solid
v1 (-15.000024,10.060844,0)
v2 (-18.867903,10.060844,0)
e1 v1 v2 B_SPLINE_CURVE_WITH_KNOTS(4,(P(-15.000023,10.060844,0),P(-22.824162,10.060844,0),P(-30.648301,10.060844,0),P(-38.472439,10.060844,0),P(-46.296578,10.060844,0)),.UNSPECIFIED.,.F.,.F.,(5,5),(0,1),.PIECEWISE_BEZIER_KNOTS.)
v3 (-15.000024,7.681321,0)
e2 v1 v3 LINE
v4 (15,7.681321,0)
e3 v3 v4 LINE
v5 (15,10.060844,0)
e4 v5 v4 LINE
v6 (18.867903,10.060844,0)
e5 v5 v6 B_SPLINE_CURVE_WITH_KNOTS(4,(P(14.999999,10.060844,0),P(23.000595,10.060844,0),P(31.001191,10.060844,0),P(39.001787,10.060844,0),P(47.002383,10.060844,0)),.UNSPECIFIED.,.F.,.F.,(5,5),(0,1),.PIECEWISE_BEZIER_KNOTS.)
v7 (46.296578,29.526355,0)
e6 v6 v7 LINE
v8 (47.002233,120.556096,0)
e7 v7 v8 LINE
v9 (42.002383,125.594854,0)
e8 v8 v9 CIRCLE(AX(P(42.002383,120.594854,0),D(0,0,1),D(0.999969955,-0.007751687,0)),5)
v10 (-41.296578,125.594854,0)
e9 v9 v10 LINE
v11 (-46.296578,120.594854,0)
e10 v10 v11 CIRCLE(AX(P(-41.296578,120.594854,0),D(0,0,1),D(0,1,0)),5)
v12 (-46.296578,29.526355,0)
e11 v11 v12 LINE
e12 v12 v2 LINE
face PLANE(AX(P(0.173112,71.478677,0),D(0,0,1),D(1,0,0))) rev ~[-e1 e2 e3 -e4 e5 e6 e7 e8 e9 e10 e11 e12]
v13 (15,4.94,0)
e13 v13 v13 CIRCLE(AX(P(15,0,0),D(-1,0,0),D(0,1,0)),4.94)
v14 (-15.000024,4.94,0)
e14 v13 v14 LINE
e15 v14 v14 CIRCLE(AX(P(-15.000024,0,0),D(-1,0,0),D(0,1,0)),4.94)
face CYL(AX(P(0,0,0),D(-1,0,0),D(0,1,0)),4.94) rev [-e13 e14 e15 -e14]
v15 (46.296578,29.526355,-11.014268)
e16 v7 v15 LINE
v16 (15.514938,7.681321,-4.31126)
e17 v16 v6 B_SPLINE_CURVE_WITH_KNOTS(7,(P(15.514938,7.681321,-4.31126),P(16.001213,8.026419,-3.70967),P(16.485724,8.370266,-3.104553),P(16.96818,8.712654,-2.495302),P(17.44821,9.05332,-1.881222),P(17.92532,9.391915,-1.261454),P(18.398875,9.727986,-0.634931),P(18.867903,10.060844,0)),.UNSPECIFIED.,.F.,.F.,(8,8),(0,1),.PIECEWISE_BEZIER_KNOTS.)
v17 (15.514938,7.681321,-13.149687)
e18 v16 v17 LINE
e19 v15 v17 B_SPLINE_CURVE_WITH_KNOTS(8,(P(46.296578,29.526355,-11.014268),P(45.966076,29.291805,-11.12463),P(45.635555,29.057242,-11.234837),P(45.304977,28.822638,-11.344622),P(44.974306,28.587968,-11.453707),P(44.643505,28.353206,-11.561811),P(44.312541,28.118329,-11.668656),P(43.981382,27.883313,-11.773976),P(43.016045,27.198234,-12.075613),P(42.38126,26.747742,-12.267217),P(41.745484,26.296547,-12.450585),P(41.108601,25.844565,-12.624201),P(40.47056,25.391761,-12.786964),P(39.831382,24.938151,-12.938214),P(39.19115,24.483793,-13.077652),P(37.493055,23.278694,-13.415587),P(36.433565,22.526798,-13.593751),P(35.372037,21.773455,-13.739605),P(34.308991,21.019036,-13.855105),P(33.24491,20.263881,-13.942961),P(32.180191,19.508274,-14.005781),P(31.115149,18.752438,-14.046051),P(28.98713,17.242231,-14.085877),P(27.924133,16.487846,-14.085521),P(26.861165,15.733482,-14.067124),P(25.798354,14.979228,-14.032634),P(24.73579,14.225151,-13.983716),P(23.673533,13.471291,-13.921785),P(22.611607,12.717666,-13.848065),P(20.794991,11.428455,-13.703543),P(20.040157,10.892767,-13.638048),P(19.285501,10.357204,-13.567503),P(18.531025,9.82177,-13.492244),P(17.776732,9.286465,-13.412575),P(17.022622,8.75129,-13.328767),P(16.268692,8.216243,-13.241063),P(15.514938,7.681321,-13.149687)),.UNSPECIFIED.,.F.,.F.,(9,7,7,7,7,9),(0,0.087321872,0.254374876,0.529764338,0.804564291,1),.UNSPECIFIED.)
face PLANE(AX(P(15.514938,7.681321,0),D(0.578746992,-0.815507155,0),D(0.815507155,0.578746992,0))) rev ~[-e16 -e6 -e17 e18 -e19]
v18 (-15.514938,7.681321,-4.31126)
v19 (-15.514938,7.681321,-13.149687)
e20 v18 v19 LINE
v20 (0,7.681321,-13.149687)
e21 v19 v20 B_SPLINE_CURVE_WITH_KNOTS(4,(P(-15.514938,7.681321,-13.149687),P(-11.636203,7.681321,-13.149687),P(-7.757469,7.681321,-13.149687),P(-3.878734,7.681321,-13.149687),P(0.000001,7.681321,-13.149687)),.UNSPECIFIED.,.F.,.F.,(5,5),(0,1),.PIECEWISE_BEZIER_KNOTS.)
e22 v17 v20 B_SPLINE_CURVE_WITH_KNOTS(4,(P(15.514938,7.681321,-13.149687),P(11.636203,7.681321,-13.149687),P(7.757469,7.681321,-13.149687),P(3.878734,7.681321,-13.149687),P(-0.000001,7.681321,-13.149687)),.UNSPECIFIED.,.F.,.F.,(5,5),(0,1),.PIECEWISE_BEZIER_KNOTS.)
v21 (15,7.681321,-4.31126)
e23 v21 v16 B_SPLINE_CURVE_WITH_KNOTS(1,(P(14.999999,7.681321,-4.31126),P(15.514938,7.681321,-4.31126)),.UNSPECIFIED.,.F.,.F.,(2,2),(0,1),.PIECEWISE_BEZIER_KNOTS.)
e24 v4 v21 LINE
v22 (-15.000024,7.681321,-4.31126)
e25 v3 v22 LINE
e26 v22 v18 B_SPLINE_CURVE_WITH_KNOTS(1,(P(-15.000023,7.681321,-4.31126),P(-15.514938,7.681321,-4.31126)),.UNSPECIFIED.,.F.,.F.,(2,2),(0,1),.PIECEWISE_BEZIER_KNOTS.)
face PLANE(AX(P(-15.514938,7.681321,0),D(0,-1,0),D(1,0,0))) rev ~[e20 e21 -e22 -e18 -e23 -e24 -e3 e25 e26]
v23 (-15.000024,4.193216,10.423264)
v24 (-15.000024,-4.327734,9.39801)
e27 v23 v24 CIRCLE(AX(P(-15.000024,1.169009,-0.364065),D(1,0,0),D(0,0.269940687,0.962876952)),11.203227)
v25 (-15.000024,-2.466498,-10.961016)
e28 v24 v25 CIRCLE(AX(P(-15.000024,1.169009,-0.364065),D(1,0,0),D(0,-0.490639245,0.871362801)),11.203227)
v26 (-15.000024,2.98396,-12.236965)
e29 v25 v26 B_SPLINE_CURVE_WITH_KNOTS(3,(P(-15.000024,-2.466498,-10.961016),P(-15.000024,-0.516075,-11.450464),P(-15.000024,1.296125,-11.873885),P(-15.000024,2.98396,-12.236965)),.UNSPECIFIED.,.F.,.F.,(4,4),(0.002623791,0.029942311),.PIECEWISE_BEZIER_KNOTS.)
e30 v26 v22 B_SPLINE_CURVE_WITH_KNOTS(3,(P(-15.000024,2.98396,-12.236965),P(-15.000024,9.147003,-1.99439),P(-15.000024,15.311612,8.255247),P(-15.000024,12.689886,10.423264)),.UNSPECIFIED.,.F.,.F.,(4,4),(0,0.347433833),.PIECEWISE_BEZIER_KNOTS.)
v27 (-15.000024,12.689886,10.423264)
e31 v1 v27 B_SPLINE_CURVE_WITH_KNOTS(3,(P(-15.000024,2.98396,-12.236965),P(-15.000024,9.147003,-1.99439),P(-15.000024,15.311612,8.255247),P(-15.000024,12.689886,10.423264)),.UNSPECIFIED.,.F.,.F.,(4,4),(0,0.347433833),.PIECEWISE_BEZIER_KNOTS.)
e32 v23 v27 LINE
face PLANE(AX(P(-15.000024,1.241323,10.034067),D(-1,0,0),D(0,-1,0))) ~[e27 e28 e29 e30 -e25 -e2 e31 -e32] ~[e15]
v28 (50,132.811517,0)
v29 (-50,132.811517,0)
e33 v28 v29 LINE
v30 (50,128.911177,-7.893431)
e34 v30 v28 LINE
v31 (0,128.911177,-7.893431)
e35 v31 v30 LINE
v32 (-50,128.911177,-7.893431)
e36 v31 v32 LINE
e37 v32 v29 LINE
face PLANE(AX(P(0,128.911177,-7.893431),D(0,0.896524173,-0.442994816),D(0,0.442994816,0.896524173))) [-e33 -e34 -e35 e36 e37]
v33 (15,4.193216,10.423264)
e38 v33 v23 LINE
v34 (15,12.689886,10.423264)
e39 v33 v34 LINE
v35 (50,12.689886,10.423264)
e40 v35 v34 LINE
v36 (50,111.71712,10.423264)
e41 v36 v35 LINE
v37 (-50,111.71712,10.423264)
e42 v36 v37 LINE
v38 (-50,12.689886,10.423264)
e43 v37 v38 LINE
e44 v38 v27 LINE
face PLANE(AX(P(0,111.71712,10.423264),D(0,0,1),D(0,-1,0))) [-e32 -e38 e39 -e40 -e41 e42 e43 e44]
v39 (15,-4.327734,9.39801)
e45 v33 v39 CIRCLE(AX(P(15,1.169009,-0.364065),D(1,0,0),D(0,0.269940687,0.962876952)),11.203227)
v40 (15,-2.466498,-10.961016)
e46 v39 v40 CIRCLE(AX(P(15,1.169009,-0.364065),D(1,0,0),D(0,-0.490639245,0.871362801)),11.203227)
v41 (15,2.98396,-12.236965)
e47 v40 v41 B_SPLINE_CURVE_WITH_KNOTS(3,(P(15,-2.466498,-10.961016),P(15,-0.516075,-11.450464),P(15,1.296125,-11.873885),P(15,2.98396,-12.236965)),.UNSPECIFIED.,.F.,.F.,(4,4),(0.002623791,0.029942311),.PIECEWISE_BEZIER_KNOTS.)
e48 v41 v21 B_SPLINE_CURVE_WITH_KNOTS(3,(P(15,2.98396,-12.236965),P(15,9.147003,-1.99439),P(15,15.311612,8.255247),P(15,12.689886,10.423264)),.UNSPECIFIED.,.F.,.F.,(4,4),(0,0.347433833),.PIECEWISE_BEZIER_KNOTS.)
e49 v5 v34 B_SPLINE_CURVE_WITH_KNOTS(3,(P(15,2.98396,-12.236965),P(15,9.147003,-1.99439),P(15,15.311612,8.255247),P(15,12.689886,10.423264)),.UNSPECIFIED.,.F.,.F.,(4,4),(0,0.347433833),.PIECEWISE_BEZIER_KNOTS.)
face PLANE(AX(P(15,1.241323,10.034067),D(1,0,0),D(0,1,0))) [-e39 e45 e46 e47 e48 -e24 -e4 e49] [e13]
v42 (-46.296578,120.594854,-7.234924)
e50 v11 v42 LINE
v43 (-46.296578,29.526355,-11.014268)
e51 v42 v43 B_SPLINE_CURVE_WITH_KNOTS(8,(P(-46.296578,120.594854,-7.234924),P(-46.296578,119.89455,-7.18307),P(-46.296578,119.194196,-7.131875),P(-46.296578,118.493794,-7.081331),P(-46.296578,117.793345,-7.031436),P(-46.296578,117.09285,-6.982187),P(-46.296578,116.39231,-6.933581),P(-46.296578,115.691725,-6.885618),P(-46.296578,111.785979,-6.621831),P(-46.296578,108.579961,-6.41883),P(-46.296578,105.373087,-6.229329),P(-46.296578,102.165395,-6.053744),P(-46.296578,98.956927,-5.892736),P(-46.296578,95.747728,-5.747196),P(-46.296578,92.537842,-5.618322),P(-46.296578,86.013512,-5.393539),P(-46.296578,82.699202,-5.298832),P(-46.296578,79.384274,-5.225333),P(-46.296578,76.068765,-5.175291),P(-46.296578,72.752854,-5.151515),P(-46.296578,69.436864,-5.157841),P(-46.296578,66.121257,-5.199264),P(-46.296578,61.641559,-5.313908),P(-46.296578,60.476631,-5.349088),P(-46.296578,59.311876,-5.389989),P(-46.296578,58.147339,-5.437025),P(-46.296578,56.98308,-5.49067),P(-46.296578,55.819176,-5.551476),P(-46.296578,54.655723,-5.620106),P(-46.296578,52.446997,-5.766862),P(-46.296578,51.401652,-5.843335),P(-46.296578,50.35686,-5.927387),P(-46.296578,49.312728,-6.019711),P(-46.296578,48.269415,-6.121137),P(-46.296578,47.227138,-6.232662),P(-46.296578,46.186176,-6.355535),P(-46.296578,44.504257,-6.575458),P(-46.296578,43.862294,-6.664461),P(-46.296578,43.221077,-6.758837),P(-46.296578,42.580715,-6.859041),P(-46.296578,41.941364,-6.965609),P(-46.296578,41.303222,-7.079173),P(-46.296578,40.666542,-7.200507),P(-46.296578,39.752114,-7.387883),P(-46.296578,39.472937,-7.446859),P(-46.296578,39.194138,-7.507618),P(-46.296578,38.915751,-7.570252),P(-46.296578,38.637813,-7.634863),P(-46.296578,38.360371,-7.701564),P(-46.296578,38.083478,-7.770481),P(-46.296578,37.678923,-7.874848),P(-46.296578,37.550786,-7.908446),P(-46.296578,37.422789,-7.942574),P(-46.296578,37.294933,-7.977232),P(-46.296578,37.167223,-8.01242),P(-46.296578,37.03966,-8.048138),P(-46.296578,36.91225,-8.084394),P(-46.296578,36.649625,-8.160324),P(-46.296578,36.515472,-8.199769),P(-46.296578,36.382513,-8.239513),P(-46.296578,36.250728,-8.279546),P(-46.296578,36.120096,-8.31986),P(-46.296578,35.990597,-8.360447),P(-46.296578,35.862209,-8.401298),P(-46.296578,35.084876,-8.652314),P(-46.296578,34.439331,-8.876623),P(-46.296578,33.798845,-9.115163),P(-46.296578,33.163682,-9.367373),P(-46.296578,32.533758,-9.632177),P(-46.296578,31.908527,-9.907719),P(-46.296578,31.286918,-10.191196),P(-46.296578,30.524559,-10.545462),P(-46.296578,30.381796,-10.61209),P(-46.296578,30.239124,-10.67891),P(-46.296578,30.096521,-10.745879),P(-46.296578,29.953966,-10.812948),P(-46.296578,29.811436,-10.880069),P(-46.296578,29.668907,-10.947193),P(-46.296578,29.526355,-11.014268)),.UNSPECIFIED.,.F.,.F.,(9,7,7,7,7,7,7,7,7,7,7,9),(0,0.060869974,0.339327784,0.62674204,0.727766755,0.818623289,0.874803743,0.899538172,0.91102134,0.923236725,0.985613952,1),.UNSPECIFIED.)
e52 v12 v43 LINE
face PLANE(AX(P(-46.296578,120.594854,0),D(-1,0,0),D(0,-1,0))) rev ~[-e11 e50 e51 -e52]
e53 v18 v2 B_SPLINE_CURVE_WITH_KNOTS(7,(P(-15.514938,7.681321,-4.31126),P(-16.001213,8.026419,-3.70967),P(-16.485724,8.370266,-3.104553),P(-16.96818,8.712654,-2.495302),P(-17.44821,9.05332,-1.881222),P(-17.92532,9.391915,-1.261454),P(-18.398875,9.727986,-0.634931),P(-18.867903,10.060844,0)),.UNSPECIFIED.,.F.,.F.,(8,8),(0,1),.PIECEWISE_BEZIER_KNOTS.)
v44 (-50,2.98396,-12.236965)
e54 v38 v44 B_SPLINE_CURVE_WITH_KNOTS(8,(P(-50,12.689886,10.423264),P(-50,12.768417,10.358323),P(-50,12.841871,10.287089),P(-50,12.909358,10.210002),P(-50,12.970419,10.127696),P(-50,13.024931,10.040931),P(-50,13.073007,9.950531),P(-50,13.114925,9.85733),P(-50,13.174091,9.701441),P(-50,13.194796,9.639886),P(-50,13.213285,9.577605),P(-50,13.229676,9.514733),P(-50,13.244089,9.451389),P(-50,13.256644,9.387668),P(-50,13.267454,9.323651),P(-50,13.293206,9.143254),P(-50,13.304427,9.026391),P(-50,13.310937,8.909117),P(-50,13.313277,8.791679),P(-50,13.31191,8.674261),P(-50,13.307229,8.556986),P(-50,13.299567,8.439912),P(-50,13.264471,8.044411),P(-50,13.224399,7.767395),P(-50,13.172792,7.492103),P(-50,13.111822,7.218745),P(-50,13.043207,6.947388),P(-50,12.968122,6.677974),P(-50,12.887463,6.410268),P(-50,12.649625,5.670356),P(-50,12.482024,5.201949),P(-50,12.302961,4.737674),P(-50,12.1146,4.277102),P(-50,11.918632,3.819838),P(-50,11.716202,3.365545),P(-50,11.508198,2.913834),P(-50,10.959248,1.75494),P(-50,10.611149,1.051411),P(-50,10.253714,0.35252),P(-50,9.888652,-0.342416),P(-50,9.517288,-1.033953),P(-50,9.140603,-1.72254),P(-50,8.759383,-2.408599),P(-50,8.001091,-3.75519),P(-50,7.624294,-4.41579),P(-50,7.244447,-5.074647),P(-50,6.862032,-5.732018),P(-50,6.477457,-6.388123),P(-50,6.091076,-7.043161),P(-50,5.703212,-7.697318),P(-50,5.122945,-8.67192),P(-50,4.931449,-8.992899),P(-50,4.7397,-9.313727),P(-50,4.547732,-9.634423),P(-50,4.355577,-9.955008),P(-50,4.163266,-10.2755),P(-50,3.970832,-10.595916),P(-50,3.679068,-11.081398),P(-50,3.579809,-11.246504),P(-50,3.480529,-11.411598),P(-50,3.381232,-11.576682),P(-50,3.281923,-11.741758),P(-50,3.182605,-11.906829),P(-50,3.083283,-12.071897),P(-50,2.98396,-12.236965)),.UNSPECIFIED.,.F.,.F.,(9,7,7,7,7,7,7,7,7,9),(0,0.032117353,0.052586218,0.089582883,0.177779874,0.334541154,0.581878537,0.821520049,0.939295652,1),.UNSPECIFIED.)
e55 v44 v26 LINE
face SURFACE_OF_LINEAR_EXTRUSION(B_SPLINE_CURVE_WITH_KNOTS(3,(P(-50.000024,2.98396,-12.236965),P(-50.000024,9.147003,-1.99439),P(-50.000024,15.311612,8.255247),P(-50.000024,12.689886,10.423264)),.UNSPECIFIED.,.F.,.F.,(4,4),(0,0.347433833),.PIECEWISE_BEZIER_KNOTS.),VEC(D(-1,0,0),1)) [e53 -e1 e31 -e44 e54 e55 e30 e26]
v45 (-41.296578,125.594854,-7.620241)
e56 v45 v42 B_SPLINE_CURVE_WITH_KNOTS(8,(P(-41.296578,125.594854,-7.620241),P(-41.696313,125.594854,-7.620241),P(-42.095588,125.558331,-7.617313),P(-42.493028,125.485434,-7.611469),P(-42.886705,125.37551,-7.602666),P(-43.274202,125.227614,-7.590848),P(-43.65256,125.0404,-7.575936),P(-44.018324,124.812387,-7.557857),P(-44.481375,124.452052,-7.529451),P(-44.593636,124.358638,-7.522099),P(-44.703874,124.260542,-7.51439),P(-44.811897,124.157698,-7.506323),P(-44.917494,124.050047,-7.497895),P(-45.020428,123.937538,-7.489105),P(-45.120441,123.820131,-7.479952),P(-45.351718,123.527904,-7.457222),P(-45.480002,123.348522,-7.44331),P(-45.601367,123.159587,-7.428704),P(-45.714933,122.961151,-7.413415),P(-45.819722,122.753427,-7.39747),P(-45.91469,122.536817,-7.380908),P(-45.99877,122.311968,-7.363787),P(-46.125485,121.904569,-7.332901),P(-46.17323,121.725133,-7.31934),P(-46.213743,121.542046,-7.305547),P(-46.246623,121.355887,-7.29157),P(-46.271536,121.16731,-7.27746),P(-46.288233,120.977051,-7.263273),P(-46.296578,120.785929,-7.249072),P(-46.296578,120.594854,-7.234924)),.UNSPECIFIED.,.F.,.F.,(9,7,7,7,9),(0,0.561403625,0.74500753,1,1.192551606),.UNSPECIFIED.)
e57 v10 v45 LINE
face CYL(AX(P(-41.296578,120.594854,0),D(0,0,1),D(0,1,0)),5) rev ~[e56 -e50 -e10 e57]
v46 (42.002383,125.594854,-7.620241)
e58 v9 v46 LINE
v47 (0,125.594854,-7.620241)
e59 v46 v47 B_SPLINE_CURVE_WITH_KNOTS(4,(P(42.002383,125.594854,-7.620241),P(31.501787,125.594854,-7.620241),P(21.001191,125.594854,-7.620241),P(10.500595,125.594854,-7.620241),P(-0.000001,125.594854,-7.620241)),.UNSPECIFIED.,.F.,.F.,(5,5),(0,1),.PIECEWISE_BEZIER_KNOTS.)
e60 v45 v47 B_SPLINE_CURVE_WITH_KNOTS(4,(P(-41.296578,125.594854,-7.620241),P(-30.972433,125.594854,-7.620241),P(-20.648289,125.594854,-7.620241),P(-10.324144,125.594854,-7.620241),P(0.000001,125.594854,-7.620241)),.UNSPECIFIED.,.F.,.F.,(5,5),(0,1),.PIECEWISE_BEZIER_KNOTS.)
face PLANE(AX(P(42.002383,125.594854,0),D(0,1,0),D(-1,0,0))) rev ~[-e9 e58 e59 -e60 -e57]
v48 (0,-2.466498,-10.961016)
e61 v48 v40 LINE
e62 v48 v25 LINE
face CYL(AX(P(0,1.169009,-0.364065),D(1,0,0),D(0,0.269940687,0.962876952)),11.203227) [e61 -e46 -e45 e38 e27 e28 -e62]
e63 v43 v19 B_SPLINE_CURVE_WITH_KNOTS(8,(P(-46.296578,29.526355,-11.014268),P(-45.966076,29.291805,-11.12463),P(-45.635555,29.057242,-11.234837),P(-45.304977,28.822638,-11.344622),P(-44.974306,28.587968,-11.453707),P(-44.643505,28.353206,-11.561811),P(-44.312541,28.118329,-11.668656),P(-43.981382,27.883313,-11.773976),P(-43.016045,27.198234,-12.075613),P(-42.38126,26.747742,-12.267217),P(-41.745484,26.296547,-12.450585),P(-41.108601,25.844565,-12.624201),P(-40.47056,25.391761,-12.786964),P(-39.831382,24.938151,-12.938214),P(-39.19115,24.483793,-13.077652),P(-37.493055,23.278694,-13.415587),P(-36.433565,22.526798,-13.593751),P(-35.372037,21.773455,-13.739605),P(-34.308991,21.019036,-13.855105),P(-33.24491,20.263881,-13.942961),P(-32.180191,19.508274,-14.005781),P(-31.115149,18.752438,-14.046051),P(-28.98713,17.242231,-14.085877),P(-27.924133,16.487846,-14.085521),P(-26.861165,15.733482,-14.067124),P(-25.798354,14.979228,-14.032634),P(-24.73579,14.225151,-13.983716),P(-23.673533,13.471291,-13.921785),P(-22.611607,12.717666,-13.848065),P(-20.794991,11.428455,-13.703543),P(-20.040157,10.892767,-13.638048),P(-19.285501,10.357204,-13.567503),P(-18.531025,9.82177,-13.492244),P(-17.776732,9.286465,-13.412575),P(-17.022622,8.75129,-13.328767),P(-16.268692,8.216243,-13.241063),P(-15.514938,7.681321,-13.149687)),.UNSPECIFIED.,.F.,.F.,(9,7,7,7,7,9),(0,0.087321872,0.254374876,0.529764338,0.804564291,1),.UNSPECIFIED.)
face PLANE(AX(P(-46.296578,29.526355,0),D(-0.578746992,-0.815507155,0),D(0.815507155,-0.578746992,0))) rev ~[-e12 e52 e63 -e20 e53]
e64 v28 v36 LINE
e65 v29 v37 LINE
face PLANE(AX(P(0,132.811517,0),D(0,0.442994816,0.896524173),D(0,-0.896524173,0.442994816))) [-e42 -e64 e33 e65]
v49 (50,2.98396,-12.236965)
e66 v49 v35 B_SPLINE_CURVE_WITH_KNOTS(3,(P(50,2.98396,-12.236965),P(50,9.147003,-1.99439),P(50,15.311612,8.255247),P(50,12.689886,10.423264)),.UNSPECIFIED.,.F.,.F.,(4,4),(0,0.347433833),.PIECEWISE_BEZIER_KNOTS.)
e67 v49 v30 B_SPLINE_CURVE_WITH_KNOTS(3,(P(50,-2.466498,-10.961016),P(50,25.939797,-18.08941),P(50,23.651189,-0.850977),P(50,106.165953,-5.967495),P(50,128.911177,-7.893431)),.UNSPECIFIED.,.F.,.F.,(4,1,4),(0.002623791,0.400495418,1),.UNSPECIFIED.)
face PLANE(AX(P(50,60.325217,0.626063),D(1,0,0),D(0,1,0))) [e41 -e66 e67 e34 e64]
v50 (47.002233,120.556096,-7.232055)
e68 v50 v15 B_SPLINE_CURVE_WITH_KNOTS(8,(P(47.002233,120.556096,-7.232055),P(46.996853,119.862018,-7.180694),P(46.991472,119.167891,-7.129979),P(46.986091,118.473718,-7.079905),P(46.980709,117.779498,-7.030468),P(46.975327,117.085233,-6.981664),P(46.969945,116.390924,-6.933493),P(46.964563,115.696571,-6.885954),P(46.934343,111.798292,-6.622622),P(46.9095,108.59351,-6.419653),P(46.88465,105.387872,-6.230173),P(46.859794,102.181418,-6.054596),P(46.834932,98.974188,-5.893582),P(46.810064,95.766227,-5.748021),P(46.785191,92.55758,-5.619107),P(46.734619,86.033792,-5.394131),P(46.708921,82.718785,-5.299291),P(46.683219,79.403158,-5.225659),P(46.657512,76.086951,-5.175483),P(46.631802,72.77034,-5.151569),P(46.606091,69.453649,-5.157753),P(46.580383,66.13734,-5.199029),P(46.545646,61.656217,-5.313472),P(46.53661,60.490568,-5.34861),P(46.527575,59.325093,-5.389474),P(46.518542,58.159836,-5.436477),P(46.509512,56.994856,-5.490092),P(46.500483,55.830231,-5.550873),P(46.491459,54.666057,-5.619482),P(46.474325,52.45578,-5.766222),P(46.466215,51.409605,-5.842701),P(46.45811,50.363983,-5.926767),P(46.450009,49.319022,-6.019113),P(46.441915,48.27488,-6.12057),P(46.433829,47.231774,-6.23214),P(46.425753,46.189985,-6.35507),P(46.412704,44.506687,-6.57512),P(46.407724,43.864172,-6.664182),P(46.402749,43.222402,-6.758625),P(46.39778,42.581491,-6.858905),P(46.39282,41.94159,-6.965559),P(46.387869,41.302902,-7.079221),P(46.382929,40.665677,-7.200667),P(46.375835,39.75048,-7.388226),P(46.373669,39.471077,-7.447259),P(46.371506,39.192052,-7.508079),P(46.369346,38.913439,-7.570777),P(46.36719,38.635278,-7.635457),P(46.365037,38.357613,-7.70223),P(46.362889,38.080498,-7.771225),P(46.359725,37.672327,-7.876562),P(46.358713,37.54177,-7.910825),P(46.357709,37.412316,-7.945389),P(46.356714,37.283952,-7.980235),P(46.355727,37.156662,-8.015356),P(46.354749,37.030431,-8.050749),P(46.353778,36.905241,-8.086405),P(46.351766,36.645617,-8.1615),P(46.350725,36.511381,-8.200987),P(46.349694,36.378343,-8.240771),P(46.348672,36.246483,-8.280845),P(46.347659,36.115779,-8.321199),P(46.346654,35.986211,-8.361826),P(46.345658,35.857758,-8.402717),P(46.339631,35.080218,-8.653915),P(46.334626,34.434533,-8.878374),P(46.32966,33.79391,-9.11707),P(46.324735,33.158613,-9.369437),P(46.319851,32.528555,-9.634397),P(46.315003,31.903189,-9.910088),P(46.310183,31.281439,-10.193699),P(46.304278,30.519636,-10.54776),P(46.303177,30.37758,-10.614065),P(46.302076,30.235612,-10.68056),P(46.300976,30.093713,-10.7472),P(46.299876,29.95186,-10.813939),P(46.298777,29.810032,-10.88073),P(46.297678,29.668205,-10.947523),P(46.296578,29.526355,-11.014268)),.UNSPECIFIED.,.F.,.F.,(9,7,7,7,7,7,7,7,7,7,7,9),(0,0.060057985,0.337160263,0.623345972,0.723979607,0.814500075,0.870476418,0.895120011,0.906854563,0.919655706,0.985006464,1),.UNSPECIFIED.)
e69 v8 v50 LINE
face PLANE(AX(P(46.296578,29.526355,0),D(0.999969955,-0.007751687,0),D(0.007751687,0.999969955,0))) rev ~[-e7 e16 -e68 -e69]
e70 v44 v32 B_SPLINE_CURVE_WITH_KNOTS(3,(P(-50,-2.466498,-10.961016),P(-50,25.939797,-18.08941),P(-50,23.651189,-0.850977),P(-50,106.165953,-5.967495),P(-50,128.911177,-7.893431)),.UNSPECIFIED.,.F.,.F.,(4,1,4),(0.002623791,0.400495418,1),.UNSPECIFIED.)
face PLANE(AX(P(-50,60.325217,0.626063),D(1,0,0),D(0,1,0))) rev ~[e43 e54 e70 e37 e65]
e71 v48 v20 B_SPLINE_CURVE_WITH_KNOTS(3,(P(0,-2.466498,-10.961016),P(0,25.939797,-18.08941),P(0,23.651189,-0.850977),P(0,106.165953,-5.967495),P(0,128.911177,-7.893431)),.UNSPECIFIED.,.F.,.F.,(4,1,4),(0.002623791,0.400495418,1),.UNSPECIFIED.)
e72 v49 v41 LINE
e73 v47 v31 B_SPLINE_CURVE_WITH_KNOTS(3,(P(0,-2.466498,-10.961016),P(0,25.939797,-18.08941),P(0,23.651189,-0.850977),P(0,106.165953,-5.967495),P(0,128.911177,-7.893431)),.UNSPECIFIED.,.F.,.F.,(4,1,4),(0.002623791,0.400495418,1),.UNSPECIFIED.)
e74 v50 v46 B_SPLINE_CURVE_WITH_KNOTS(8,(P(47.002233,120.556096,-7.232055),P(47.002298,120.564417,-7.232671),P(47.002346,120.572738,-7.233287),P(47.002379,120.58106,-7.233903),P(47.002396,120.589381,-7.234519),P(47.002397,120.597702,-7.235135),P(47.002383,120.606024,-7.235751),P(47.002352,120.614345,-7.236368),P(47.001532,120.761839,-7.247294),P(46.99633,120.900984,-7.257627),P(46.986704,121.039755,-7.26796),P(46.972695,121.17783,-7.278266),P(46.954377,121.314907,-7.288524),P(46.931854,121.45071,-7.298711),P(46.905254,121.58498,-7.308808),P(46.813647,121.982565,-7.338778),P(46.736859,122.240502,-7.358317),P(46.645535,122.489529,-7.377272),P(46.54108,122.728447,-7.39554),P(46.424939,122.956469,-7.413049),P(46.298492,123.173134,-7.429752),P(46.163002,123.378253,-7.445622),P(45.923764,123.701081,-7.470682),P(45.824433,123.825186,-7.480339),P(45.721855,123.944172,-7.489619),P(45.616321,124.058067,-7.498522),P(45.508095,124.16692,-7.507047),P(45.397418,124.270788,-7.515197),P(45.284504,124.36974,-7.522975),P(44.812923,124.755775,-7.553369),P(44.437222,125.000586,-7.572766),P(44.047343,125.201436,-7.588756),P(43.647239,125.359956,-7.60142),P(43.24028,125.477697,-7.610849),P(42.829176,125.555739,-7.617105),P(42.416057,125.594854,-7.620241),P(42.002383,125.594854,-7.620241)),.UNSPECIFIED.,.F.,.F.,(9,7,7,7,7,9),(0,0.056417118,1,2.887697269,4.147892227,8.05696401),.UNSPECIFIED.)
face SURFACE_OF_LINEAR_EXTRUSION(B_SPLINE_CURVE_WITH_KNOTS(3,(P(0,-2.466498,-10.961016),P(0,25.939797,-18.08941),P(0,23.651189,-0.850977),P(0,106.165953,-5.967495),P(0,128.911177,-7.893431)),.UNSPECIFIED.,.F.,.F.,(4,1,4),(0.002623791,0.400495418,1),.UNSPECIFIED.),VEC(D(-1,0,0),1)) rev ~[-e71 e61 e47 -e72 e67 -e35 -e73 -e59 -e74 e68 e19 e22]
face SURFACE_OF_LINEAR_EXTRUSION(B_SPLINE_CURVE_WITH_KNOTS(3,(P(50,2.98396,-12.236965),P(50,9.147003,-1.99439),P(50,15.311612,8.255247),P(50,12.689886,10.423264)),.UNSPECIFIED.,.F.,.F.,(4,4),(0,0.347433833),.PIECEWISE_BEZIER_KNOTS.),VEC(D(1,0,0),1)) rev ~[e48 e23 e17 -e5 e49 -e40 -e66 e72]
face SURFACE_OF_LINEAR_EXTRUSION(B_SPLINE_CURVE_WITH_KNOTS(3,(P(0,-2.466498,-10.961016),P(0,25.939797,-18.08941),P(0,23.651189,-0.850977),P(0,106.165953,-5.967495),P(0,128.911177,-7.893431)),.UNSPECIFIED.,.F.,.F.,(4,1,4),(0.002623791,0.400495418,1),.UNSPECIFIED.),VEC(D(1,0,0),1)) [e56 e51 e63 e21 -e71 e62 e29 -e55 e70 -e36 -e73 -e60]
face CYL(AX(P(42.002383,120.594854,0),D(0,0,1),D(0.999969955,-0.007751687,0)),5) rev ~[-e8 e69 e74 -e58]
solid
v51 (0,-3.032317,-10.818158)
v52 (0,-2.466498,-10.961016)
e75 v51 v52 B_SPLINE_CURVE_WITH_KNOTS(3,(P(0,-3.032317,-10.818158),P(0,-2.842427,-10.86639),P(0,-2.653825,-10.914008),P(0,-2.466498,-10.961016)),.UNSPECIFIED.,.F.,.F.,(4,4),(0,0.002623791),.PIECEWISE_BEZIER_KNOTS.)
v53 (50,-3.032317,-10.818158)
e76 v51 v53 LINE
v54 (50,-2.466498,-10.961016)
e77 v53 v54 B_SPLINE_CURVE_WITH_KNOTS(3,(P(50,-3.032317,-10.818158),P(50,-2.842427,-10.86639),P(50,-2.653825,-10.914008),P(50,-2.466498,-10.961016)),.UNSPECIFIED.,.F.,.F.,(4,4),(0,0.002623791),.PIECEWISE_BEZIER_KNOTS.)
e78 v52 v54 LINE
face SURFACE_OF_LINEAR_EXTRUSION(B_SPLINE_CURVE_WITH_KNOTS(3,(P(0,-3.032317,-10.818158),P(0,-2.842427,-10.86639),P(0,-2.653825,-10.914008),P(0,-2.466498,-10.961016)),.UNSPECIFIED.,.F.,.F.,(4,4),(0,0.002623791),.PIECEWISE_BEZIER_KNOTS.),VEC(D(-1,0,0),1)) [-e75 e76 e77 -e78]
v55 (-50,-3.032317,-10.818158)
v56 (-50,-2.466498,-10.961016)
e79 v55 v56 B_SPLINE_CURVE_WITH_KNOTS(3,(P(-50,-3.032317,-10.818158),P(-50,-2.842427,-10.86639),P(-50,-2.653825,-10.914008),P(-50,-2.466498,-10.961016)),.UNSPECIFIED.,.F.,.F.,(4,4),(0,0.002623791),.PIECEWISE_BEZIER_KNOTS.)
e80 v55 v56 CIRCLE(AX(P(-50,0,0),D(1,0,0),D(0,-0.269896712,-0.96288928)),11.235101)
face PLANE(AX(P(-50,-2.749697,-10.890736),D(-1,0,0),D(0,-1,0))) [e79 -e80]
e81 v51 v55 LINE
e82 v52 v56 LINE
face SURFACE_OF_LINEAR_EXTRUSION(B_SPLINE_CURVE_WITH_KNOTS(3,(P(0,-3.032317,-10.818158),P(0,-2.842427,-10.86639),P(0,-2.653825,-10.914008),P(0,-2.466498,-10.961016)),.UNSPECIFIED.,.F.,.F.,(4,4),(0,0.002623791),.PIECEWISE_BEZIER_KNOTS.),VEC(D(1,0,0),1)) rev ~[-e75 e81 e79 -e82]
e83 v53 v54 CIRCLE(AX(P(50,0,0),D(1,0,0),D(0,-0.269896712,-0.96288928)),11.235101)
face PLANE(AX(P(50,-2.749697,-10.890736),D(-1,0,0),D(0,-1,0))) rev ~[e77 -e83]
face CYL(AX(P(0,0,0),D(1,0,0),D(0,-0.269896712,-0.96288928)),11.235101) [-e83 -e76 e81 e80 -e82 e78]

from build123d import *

# Parameters (mm, degrees)
F1_DEPTH = 50
F0_R     = 4.94
F2_R     = 4.94
F3_DEPTH = 35
F5_DEPTH = 25


# Not quite as in the source:
# - a pattern or mirror of a feature is missing from the dataset's text; its kind, count and spacing are read off the source's solid


with BuildPart() as f1:
    # F0 (on Right) → F1 (new body, symmetric)
    with BuildSketch(Plane.YZ):
        with BuildLine():
            add(Edge.make_bspline(
                [(-3.0323168048, -10.8181582689), (-2.8424272556, -10.8663900835), (-2.6538250298, -10.9140078026), (-2.4664978488, -10.9610164628)],
                knots=[0, 0, 0, 0, 0.0026237907, 0.0026237907, 0.0026237907, 0.0026237907], degree=3))
            ThreePointArc((-3.0323168048, -10.8181582689), (-2.7503350277, -10.8932617141), (-2.4664978488, -10.9610164628))
        make_face()
    extrude(amount=F1_DEPTH, both=True)


with BuildPart() as f1b:
    # F0 (on Right) → F1, piece 2 (new body, symmetric)
    with BuildSketch(Plane.YZ):
        with BuildLine():
            ThreePointArc((4.1932159041, 10.4232640722), (-9.5274989599, 2.9671522383), (-2.4664978488, -10.9610164628))
            add(Edge.make_bspline(
                [(-2.4664978488, -10.9610164628), (25.9397967098, -18.0894099096), (23.6511889197, -0.8509774431), (106.1659529805, -5.9674950317), (128.9111768297, -7.8934305644)],
                knots=[0.0026237907, 0.0026237907, 0.0026237907, 0.0026237907, 0.4004954175, 1, 1, 1, 1], degree=3))
            Line((128.9111768297, -7.8934305644), (132.8115165234, 0))
            Line((132.8115165234, 0), (111.7171202219, 10.4232640722))
            Line((111.7171202219, 10.4232640722), (4.1932159041, 10.4232640722))
        make_face()
        Circle(F0_R, mode=Mode.SUBTRACT)
    extrude(amount=F1_DEPTH, both=True)

    # F2 (on face) → F3 (cut)
    with BuildSketch(Plane.YZ.offset(50)):
        with BuildLine():
            Line((6.8677525204, 10.4232640722), (4.1932159041, 10.4232640722))
            ThreePointArc((4.1932159041, 10.4232640722), (-0.1693274921, 10.7589359529), (-4.3277336512, 9.3980102714))
            add(Edge.make_bspline(
                [(6.8677525204, 10.4232640722), (3.5056440269, 9.7988076387), (-0.669971735, 8.8655469209), (-4.3277336512, 9.3980102714)],
                knots=[0.4757656296, 0.4757656296, 0.4757656296, 0.4757656296, 0.6363648624, 0.6363648624, 0.6363648624, 0.6363648624], degree=3))
        make_face()
        with BuildLine():
            add(Edge.make_bspline(
                [(12.6898856834, 10.4232640722), (11.721497416, 11.2240656804), (9.5543495494, 10.9222553456), (6.8677525204, 10.4232640722)],
                knots=[0.3474338334, 0.3474338334, 0.3474338334, 0.3474338334, 0.4757656296, 0.4757656296, 0.4757656296, 0.4757656296], degree=3))
            Line((6.8677525204, 10.4232640722), (12.6898856834, 10.4232640722))
        make_face()
        with BuildLine():
            Line((12.6898856834, 10.4232640722), (6.8677525204, 10.4232640722))
            add(Edge.make_bspline(
                [(6.8677525204, 10.4232640722), (3.5056440269, 9.7988076387), (-0.669971735, 8.8655469209), (-4.3277336512, 9.3980102714)],
                knots=[0.4757656296, 0.4757656296, 0.4757656296, 0.4757656296, 0.6363648624, 0.6363648624, 0.6363648624, 0.6363648624], degree=3))
            ThreePointArc((-4.3277336512, 9.3980102714), (-9.9876923855, -1.3840180073), (-2.4664978488, -10.9610164628))
            add(Edge.make_bspline(
                [(-2.4664978488, -10.9610164628), (-0.516074965, -11.4504636758), (1.2961245634, -11.8738848534), (2.9839597919, -12.2369650055)],
                knots=[0.0026237907, 0.0026237907, 0.0026237907, 0.0026237907, 0.0299423107, 0.0299423107, 0.0299423107, 0.0299423107], degree=3))
            add(Edge.make_bspline(
                [(2.9839597919, -12.2369650055), (9.1470031068, -1.994389644), (15.3116120056, 8.255246629), (12.6898856834, 10.4232640722)],
                knots=[0, 0, 0, 0, 0.3474338334, 0.3474338334, 0.3474338334, 0.3474338334], degree=3))
        make_face()
        Circle(F2_R, mode=Mode.SUBTRACT)
        Circle(F2_R)
    f3 = extrude(amount=-F3_DEPTH, mode=Mode.SUBTRACT)

    # F3_copies: F3 across plane
    add(f3.mirror(Plane(origin=(-1.2e-05, 0, 0), x_dir=(0, 0, -1), z_dir=(-1, 0, 0))), mode=Mode.SUBTRACT)

    # F4 (on Top) → F5 (cut)
    with BuildSketch(Plane.XY):
        with BuildLine():
            Line((-46.2965779006, 29.526354745), (-15.5149381608, 7.6813208871))
            Line((-15.5149381608, 7.6813208871), (15.5149381608, 7.6813208871))
            Line((15.5149381608, 7.6813208871), (46.2965779006, 29.526354745))
            Line((46.2965779006, 29.526354745), (47.0022331808, 120.5560959189))
            ThreePointArc((47.0022331808, 120.5560959189), (45.5515940339, 124.1166584252), (42.0023834047, 125.5948543549))
            Line((42.0023834047, 125.5948543549), (-41.2965779006, 125.5948543549))
            ThreePointArc((-41.2965779006, 125.5948543549), (-44.8321118066, 124.1303882608), (-46.2965779006, 120.5948543549))
            Line((-46.2965779006, 120.5948543549), (-46.2965779006, 29.526354745))
        make_face()
    extrude(amount=-F5_DEPTH, mode=Mode.SUBTRACT)


solid = Compound([f1.part, f1b.part])
